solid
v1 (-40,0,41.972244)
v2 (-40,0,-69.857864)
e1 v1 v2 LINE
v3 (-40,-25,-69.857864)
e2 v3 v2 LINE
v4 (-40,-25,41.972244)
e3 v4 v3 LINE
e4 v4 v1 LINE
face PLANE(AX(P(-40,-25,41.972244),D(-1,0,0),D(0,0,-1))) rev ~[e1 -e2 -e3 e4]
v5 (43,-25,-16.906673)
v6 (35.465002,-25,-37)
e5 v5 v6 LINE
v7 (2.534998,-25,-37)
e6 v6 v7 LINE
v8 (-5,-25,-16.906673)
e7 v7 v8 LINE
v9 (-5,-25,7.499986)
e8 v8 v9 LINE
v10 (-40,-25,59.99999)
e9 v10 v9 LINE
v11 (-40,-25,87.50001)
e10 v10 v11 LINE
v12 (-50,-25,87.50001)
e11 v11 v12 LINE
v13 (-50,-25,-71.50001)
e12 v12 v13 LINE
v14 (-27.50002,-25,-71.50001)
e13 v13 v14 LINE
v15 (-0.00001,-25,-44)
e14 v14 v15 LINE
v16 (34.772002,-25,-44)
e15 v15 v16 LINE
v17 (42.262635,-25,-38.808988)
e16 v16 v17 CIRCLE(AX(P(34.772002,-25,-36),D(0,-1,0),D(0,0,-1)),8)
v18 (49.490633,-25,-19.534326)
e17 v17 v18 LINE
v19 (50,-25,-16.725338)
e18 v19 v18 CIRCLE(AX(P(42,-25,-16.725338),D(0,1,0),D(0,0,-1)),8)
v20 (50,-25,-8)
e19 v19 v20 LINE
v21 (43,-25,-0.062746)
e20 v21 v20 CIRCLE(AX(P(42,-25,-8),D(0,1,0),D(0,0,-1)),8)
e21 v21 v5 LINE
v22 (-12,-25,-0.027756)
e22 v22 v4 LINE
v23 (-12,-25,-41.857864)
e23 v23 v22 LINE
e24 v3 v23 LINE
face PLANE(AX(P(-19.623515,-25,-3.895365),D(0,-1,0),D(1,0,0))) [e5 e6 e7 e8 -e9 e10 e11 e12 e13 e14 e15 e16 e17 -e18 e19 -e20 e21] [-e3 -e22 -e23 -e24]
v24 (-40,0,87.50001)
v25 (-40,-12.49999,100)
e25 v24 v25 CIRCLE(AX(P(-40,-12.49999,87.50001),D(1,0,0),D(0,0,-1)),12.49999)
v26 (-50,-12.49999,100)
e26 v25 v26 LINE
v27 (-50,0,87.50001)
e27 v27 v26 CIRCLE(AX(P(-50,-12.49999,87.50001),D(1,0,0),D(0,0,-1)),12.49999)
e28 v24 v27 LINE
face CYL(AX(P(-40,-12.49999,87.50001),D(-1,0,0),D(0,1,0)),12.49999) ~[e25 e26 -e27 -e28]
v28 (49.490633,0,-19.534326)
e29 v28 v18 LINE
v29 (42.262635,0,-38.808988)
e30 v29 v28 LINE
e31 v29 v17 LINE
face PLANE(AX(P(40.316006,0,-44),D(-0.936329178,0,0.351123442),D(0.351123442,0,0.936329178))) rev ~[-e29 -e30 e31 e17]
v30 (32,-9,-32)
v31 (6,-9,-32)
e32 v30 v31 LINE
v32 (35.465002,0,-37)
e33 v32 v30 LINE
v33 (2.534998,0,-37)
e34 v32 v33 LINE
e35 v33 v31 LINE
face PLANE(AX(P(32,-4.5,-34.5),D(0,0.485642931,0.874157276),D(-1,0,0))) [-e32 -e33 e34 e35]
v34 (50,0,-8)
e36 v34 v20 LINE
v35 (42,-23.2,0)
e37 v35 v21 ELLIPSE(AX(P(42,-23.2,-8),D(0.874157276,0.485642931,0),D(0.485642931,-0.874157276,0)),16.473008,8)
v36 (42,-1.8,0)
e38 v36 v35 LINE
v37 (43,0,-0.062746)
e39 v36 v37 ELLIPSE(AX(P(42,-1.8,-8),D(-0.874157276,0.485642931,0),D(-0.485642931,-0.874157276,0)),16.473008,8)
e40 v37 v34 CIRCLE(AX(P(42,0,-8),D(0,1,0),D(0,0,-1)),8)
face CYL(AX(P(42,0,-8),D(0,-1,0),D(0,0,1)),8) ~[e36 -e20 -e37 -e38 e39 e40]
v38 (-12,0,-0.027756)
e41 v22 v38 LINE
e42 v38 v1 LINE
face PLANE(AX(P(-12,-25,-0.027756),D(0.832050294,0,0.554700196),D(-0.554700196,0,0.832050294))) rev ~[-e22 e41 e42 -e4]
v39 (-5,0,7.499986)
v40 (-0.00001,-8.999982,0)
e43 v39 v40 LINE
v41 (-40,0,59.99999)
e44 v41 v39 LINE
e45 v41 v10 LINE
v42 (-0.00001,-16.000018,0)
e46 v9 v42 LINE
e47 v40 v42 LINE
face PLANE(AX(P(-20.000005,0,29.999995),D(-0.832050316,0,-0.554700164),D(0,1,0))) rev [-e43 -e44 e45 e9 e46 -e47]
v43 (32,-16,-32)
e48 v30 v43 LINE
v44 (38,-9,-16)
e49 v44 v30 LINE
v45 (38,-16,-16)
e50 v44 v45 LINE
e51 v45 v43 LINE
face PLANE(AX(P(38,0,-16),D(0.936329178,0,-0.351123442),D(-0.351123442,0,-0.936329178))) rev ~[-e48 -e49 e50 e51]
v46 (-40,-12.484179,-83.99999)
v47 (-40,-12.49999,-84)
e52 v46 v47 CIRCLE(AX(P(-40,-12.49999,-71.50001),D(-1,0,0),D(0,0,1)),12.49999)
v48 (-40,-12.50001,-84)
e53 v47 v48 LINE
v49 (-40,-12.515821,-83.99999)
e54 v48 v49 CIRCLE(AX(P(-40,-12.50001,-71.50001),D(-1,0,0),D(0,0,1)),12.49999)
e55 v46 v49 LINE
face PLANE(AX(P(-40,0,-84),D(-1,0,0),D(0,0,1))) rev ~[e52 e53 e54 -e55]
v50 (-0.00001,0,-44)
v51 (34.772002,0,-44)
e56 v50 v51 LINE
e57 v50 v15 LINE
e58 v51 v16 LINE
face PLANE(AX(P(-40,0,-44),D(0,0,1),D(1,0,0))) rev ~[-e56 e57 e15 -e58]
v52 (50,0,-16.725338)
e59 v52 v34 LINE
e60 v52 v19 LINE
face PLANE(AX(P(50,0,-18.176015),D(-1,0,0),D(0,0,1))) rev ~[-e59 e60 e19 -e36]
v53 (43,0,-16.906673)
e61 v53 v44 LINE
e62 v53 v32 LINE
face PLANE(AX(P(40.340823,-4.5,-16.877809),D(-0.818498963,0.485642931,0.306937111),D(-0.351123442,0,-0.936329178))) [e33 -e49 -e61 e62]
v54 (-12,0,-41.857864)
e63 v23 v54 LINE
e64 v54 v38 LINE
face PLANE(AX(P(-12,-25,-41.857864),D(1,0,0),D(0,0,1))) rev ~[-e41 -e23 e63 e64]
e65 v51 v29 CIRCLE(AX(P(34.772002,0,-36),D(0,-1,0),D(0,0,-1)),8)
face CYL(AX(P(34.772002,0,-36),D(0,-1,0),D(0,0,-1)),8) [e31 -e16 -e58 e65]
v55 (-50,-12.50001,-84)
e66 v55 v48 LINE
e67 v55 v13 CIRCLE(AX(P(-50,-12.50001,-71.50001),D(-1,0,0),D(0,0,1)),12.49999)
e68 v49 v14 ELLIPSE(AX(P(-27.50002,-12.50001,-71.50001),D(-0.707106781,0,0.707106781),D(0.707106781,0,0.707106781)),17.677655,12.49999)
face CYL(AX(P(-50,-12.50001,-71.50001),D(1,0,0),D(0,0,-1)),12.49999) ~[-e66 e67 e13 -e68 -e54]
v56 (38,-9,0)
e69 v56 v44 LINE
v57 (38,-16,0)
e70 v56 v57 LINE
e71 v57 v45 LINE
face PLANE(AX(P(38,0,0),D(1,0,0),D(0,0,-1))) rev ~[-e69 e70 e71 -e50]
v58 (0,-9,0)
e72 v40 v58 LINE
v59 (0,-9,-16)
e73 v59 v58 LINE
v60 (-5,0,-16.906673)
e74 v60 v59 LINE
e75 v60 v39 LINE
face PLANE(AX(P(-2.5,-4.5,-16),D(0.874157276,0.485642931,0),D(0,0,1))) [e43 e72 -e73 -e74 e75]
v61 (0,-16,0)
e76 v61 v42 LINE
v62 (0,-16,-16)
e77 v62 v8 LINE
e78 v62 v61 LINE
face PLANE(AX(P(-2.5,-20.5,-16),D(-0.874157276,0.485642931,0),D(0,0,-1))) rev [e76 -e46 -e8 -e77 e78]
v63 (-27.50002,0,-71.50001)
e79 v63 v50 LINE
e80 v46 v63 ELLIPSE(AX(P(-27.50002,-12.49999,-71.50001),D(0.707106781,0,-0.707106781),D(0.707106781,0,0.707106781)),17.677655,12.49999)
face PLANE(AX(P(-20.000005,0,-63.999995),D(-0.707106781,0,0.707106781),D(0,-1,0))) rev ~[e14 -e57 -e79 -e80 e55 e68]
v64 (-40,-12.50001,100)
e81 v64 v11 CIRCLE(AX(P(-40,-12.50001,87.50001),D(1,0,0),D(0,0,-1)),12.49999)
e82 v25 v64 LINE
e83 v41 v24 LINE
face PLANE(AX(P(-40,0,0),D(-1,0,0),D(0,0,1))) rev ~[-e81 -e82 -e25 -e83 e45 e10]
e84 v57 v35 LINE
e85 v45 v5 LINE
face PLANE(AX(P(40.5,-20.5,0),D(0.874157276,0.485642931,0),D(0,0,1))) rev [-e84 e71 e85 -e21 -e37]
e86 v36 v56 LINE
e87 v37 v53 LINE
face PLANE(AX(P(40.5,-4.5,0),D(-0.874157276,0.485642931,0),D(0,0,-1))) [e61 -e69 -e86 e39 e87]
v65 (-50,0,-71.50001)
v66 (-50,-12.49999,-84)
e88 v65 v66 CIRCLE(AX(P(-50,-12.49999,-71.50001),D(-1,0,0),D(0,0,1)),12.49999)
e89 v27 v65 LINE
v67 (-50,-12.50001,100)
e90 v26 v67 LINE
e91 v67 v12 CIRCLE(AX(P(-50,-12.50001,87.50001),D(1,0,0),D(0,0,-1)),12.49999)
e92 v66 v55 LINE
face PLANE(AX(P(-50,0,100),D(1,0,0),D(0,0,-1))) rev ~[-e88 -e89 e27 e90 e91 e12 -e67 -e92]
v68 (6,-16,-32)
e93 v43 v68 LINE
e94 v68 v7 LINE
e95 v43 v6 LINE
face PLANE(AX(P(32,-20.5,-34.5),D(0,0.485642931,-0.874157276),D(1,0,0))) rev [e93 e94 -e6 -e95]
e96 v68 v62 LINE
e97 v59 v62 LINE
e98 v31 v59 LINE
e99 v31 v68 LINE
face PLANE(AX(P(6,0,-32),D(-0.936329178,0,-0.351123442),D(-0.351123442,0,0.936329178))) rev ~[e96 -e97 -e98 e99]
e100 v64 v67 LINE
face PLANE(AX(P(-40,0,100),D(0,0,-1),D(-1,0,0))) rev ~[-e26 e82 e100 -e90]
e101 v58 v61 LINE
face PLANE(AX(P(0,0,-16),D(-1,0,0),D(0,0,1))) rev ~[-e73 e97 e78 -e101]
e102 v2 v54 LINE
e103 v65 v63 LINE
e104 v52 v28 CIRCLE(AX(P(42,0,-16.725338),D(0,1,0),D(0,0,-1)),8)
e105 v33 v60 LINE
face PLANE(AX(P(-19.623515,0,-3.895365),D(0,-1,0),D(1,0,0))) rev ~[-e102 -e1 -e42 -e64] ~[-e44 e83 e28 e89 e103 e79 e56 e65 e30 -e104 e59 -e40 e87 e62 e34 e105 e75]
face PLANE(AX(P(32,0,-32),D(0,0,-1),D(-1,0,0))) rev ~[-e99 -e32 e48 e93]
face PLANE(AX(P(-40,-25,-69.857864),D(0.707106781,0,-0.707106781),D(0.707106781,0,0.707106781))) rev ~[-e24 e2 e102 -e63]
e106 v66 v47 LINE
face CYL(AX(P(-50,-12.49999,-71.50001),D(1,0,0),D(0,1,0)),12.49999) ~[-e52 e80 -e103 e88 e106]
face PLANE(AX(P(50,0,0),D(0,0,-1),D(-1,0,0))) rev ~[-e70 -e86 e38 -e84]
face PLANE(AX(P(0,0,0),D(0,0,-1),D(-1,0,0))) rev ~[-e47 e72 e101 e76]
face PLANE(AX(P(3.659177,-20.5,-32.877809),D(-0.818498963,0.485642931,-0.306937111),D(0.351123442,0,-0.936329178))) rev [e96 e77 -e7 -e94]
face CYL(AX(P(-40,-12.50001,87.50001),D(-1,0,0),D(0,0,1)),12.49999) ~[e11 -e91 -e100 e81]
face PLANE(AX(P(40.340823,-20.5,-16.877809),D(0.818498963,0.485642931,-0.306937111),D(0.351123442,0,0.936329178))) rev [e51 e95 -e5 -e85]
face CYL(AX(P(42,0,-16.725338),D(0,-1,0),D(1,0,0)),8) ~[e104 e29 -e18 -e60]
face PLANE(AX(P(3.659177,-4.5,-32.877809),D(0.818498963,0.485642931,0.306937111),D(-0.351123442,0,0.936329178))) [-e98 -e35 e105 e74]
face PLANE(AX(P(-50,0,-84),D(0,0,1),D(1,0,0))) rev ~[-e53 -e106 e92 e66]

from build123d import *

# Parameters (mm, degrees)
F1_DEPTH = 25
F2_SIZE2 = 5
F2_SIZE  = 9
F3_SIZE2 = 9
F3_SIZE  = 5
F4_R     = 8
F5_R     = 12.49999
F6_SIZE2 = 39.99999
F6_SIZE  = 59.99999
F7_SIZE  = 39.99999
F9_DEPTH = 25.001


# Not quite as in the source:
# - a fillet or chamfer is up to 0.001 mm smaller than in the source, because OpenCascade refuses the exact size


with BuildPart() as f1:
    # F0 (on Front) → F1 (new body)
    with BuildSketch(Plane.XZ):
        Polygon((0, -16), (0, 0), (-40, 0), (-40, 100), (-50, 100), (-50, -84), (-40, -84), (-40, -44), (40.316005618, -44), (50, -18.1760149813), (50, 0), (38, 0), (38, -16), (32, -32), (6, -32), align=None)
    extrude(amount=F1_DEPTH)

    # F2
    f2_edges = [f1.edges().sort_by_distance(p)[0] for p in [
        (19, -25, -32),
        (3, -25, -24),
        (0, -25, -8),
        (35, -25, -24),
        (38, -25, -8),
    ]]
    chamfer(f2_edges, length=F2_SIZE, length2=F2_SIZE2)

    # F3
    f3_edges = [f1.edges().sort_by_distance(p)[0] for p in [
        (19, 0, -32),
        (3, 0, -24),
        (0, 0, -8),
        (35, 0, -24),
        (38, 0, -8),
    ]]
    f3_side = f1.faces().sort_by_distance((-19.786858, 0, -11.21384))[0]
    chamfer(f3_edges, length=F3_SIZE, length2=F3_SIZE2, reference=f3_side)

    # F4
    f4_edges = [f1.edges().sort_by_distance(p)[0] for p in [
        (40.316006, -12.5, -44),
        (50, -12.5, -18.176015),
        (50, -12.5, 0),
    ]]
    fillet(f4_edges, radius=F4_R)

    # F5 (radius 12.5 in the source; OpenCascade refuses exactly that, so slightly less here)
    f5_edges = [f1.edges().sort_by_distance(p)[0] for p in [
        (-45, -25, -84),
        (-45, 0, -84),
        (-45, -25, 100),
        (-45, 0, 100),
    ]]
    fillet(f5_edges, radius=F5_R)

    # F6 (size 60 and 40 in the source; OpenCascade refuses exactly that, so slightly less here)
    f6_edges = [f1.edges().sort_by_distance(p)[0] for p in [
        (-40, -12.5, 0),
    ]]
    f6_side = f1.faces().sort_by_distance((-40, -12.5, 48.698732))[0]
    chamfer(f6_edges, length=F6_SIZE, length2=F6_SIZE2, reference=f6_side)

    # F7 (size 40 in the source; OpenCascade refuses exactly that, so slightly less here)
    f7_edges = [f1.edges().sort_by_distance(p)[0] for p in [
        (-40, -12.5, -44),
    ]]
    chamfer(f7_edges, length=F7_SIZE)

    # F8 (on face) → F9 (cut, through all)
    with BuildSketch(Plane.XZ.offset(25)):
        Polygon((-12, -0.0277563773), (-40, 41.9722436227), (-40, -69.8578643763), (-12, -41.8578643763), align=None)
    extrude(amount=-F9_DEPTH, mode=Mode.SUBTRACT)


solid = f1.part
